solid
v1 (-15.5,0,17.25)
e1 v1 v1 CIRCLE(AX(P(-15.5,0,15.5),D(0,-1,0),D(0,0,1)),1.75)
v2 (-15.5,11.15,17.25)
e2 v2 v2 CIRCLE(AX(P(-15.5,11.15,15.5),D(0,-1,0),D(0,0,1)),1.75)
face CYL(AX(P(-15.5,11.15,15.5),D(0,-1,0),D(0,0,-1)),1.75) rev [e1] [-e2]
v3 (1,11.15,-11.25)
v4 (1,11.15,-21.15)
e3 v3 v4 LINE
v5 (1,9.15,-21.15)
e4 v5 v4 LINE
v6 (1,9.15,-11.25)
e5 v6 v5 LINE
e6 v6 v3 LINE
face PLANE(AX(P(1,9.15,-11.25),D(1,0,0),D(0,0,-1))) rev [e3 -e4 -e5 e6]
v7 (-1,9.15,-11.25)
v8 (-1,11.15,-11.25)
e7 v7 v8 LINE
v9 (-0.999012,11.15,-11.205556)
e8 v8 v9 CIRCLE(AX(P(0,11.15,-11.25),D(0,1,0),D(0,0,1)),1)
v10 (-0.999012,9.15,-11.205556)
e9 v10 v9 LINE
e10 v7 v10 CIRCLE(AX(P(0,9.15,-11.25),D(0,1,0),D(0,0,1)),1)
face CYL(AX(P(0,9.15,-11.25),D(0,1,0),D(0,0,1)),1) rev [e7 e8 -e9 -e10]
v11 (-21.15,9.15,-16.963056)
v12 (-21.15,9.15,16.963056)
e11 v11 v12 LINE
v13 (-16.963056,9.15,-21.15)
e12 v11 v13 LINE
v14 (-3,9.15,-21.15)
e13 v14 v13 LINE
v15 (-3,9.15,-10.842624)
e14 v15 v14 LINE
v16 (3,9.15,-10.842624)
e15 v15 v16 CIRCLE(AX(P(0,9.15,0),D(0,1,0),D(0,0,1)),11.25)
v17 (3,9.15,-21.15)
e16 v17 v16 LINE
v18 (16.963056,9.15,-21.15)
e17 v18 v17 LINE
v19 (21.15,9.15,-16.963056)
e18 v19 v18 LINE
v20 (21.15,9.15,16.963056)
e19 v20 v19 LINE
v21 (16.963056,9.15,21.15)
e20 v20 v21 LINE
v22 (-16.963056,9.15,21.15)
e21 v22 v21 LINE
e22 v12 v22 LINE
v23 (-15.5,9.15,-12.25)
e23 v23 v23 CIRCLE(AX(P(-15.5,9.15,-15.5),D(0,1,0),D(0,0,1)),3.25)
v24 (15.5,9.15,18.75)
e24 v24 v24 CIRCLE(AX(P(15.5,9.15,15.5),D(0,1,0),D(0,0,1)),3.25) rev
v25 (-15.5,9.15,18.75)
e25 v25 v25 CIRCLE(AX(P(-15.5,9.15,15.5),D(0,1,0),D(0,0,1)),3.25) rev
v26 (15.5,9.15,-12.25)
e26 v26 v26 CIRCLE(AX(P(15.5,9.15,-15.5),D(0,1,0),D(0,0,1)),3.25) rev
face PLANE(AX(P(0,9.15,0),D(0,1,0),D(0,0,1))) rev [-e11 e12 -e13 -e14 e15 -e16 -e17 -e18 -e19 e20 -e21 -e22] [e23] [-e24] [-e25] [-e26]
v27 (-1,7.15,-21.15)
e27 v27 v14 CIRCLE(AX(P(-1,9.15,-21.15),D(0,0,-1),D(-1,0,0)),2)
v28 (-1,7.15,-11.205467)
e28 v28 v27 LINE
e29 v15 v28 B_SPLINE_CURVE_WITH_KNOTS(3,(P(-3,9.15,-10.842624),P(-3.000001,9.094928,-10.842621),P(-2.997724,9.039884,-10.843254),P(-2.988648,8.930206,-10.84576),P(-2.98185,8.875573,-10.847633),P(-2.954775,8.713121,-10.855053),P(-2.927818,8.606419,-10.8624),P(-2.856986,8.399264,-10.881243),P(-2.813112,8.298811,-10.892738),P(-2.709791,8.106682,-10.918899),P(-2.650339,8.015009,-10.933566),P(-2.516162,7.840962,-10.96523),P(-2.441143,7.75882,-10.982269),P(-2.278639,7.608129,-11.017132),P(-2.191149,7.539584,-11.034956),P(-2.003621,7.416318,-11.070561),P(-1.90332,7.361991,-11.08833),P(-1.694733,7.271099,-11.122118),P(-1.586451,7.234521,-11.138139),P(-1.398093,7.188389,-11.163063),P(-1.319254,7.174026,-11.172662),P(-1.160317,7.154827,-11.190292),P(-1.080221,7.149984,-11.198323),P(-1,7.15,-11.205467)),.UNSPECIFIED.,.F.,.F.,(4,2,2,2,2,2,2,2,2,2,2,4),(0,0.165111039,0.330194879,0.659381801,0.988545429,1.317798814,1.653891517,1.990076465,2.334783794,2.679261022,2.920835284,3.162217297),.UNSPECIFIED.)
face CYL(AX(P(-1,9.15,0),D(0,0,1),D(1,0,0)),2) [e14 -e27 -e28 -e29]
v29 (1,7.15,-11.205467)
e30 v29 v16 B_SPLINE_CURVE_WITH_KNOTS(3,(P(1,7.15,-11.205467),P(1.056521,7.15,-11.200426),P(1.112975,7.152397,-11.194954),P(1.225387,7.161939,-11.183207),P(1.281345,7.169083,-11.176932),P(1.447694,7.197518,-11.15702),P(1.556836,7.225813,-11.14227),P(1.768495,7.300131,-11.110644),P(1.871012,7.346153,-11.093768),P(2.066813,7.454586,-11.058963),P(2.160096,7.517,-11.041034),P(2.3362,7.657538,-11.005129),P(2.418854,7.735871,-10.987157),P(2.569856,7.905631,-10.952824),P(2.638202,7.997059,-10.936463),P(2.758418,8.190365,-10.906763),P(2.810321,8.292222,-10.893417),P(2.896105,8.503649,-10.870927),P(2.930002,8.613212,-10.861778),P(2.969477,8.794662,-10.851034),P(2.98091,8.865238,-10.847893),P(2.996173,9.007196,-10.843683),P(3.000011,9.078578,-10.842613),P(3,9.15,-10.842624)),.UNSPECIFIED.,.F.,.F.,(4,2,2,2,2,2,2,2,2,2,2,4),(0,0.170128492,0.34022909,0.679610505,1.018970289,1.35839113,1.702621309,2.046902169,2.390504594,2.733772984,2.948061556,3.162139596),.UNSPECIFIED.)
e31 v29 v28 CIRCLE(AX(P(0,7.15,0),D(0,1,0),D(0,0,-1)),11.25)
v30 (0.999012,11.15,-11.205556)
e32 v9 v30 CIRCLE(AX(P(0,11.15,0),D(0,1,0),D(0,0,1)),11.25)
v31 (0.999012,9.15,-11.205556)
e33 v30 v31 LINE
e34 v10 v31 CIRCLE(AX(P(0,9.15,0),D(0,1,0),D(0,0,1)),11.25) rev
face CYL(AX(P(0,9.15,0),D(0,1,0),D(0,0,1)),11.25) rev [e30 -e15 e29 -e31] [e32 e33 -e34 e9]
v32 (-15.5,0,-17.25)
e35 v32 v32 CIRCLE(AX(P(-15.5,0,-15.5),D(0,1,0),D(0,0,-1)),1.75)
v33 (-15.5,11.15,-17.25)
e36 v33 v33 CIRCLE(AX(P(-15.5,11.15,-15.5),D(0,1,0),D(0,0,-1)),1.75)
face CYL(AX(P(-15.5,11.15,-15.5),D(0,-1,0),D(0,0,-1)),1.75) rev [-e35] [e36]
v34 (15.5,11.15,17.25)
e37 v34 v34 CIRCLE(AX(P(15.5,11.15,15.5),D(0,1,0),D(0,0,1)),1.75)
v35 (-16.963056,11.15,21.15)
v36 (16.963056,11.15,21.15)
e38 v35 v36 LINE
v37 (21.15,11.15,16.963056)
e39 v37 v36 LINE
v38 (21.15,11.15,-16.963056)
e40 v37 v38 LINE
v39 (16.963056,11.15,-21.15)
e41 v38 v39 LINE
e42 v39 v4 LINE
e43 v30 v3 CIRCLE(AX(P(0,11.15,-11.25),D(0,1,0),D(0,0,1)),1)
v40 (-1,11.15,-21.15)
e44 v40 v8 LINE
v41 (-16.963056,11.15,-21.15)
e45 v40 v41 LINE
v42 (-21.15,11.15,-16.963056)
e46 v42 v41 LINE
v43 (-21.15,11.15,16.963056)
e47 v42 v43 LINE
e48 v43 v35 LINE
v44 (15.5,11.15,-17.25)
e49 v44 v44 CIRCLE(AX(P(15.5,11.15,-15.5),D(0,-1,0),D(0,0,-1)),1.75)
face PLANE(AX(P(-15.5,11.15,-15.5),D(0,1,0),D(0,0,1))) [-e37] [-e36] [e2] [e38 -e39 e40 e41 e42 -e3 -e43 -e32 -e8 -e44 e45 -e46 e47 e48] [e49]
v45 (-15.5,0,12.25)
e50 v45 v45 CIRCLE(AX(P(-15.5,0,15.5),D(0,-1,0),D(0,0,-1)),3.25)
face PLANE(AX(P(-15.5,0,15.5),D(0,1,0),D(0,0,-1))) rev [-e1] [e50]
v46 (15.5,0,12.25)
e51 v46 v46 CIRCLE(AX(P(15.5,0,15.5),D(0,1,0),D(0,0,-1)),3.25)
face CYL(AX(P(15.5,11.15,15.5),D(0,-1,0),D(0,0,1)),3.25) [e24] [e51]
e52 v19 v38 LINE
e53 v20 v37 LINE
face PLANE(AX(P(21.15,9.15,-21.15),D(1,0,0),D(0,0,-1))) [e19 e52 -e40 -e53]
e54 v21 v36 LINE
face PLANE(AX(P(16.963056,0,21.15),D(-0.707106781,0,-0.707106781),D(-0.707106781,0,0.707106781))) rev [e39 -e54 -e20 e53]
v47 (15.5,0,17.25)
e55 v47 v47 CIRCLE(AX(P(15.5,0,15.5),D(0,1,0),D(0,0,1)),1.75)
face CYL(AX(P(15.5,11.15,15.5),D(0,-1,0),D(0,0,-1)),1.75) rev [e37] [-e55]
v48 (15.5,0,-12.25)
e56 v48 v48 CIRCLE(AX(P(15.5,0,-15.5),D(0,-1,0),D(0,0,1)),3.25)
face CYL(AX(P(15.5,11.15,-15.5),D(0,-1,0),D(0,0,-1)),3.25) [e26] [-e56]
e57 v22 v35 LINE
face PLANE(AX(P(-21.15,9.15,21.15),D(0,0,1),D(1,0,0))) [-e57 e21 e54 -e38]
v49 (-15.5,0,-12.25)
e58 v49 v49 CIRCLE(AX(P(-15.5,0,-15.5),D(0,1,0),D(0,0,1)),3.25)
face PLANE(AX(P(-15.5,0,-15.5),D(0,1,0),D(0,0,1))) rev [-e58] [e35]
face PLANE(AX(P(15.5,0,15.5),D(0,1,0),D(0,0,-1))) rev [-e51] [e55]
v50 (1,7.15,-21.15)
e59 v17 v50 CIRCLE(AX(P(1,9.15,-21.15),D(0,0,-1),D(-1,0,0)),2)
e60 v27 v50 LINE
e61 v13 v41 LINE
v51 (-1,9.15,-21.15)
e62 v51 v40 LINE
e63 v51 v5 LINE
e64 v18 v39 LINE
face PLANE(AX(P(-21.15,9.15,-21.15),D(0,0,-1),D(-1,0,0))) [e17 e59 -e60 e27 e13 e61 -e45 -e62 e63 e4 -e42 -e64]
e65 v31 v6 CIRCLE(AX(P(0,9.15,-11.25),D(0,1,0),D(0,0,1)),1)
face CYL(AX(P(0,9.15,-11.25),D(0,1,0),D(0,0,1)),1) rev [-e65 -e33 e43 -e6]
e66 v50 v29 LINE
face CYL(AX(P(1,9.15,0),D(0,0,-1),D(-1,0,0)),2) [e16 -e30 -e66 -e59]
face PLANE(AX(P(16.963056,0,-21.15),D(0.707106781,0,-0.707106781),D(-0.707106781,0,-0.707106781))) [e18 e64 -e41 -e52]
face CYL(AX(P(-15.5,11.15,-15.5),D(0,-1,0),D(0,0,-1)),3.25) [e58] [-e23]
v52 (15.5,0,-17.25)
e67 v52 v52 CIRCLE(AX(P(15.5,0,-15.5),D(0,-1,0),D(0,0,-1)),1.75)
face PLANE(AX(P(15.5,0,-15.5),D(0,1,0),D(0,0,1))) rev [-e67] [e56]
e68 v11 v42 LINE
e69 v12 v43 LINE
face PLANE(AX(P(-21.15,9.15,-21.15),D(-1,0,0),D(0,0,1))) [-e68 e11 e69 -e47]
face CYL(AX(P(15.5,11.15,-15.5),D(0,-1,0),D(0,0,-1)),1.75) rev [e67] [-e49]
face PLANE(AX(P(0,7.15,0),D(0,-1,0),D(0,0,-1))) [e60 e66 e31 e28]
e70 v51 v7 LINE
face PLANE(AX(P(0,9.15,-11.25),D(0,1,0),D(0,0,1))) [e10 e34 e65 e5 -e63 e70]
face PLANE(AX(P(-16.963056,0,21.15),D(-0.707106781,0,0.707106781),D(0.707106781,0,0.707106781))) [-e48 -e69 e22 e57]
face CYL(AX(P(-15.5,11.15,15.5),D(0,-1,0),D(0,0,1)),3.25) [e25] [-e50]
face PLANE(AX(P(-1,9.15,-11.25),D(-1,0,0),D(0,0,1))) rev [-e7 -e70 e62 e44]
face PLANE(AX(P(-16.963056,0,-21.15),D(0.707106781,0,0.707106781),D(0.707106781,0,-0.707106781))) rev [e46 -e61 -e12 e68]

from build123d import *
from build123d.topology import SkipClean

# Parameters (mm, degrees)
SKETCH1_R               = 3.25
BOSS_EXTRUDE1_DEPTH     = 11.15
SKETCH2_W               = 42.3
SKETCH2_H               = 42.3
SKETCH2_R               = 11.25
BOSS_EXTRUDE2_DEPTH     = 2
CUT_EXTRUDE1_DEPTH      = 32.921270338
SKETCH4_R               = 1.75
CUT_EXTRUDE2_DEPTH      = 32.921270338
MIRROR6_COPY_1_SKETCH_R = 1.75
MIRROR6_COPY_1_DEPTH    = 32.921270338
BOSS_EXTRUDE3_DEPTH     = 2
CUT_EXTRUDE3_DEPTH      = 2
FILLET1_R               = 2


with BuildPart() as part:
    # Sketch1 → Boss-Extrude1 (new body)
    with BuildSketch(Plane(origin=(0, 0, 0), x_dir=(1, 0, 0), z_dir=(0, 1, 0))):
        with Locations(Location((-15.5, 15.5, 0), (0, 0, 270))):
            Circle(SKETCH1_R)
    extrude(amount=BOSS_EXTRUDE1_DEPTH)


with BuildPart() as body_2:
    # Mirror2: mirrored copy
    add(part.part.mirror(Plane(origin=(0, 0, 0), x_dir=(0, 0, 1), z_dir=(1, 0, 0))))


with BuildPart() as body_3:
    # Mirror3: mirrored copy
    add(part.part.mirror(Plane.XY))


with BuildPart() as body_4:
    # Mirror3 2: mirrored copy
    add(body_2.part.mirror(Plane.XY))


with BuildPart() as part_1:
    add(part.part)

    add(body_2.part)  # Boss-Extrude2 merges body 2

    add(body_3.part)  # Boss-Extrude2 merges body 3

    add(body_4.part)  # Boss-Extrude2 merges body 4
    # Sketch2 → Boss-Extrude2 (add)
    with BuildSketch(Plane(origin=(0, 11.15, 0), x_dir=(1, 0, 0), z_dir=(0, 1, 0))):
        Rectangle(SKETCH2_W, SKETCH2_H)
        with Locations(Location((0, 0, 0), (0, 0, 270))):
            Circle(SKETCH2_R, mode=Mode.SUBTRACT)
    extrude(amount=-BOSS_EXTRUDE2_DEPTH)

    # Sketch3 → Cut-Extrude1 (cut, through all)
    with BuildSketch(Plane(origin=(0, 11.15, 0), x_dir=(1, 0, 0), z_dir=(0, 1, 0))):
        Polygon((-16.963055506, 21.15), (-21.15, 16.963055506), (-21.15, 21.15), align=None)
        Polygon((16.963055506, -21.15), (21.15, -16.963055506), (21.15, -21.15), align=None)
    cut_extrude1 = extrude(amount=-CUT_EXTRUDE1_DEPTH, mode=Mode.SUBTRACT)

    # Mirror4: Cut-Extrude1 across plane
    add(cut_extrude1.mirror(Plane.XY), mode=Mode.SUBTRACT)

    # Sketch4 → Cut-Extrude2 (cut, through all)
    with BuildSketch(Plane.XZ):
        with Locations(Location((15.5, -15.5, 0), (0, 0, 270))):
            Circle(SKETCH4_R)
    cut_extrude2 = extrude(amount=-CUT_EXTRUDE2_DEPTH, mode=Mode.SUBTRACT)

    # Mirror5: Cut-Extrude2 across plane
    add(cut_extrude2.mirror(Plane(origin=(0, 0, 0), x_dir=(0, 0, 1), z_dir=(1, 0, 0))), mode=Mode.SUBTRACT)

    # Mirror6: Cut-Extrude2 across plane
    add(cut_extrude2.mirror(Plane.XY), mode=Mode.SUBTRACT)

    # Mirror6 copy 1 sketch → Mirror6 copy 1 (cut, through all)
    with BuildSketch(Plane(origin=(0, 0, 0), x_dir=(-1, 0, 0), z_dir=(0, -1, 0))):
        with Locations(Location((15.5, -15.5, 0), (0, 0, 270))):
            Circle(MIRROR6_COPY_1_SKETCH_R)
    extrude(amount=-MIRROR6_COPY_1_DEPTH, mode=Mode.SUBTRACT)

    # Sketch6 → Boss-Extrude3 (add)
    with SkipClean():  # the faces are left unmerged after this step: merging them gives an invalid solid
        with BuildSketch(Plane.XZ.offset(-9.15)):
            with BuildLine():
                Line((-3, -21.15), (-3, -10.842624221))
                ThreePointArc((-3, -10.842624221), (0, -11.25), (3, -10.842624221))
                Line((3, -10.842624221), (3, -21.15))
                Line((3, -21.15), (-3, -21.15))
            make_face()
        extrude(amount=BOSS_EXTRUDE3_DEPTH)

    # Sketch7 → Cut-Extrude3 (cut)
    with SkipClean():  # the faces are left unmerged after this step: merging them gives an invalid solid
        with BuildSketch(Plane(origin=(0, 11.15, 0), x_dir=(1, 0, 0), z_dir=(0, 1, 0))):
            with BuildLine():
                Line((-1, 11.25), (-1, 21.15))
                ThreePointArc((-1, 21.15), (0, 22.15), (1, 21.15))
                Line((1, 21.15), (1, 11.25))
                ThreePointArc((1, 11.25), (0, 10.25), (-1, 11.25))
            make_face()
        extrude(amount=-CUT_EXTRUDE3_DEPTH, mode=Mode.SUBTRACT)

    # Fillet1
    fillet1_edges = [part_1.edges().sort_by_distance(p)[0] for p in [
        (3, 7.15, -15.996312111),
        (-3, 7.15, -15.996312111),
    ]]
    fillet(fillet1_edges, radius=FILLET1_R - 0.0001)  # a hair under: the kernel refuses the full size


solid = part_1.part
